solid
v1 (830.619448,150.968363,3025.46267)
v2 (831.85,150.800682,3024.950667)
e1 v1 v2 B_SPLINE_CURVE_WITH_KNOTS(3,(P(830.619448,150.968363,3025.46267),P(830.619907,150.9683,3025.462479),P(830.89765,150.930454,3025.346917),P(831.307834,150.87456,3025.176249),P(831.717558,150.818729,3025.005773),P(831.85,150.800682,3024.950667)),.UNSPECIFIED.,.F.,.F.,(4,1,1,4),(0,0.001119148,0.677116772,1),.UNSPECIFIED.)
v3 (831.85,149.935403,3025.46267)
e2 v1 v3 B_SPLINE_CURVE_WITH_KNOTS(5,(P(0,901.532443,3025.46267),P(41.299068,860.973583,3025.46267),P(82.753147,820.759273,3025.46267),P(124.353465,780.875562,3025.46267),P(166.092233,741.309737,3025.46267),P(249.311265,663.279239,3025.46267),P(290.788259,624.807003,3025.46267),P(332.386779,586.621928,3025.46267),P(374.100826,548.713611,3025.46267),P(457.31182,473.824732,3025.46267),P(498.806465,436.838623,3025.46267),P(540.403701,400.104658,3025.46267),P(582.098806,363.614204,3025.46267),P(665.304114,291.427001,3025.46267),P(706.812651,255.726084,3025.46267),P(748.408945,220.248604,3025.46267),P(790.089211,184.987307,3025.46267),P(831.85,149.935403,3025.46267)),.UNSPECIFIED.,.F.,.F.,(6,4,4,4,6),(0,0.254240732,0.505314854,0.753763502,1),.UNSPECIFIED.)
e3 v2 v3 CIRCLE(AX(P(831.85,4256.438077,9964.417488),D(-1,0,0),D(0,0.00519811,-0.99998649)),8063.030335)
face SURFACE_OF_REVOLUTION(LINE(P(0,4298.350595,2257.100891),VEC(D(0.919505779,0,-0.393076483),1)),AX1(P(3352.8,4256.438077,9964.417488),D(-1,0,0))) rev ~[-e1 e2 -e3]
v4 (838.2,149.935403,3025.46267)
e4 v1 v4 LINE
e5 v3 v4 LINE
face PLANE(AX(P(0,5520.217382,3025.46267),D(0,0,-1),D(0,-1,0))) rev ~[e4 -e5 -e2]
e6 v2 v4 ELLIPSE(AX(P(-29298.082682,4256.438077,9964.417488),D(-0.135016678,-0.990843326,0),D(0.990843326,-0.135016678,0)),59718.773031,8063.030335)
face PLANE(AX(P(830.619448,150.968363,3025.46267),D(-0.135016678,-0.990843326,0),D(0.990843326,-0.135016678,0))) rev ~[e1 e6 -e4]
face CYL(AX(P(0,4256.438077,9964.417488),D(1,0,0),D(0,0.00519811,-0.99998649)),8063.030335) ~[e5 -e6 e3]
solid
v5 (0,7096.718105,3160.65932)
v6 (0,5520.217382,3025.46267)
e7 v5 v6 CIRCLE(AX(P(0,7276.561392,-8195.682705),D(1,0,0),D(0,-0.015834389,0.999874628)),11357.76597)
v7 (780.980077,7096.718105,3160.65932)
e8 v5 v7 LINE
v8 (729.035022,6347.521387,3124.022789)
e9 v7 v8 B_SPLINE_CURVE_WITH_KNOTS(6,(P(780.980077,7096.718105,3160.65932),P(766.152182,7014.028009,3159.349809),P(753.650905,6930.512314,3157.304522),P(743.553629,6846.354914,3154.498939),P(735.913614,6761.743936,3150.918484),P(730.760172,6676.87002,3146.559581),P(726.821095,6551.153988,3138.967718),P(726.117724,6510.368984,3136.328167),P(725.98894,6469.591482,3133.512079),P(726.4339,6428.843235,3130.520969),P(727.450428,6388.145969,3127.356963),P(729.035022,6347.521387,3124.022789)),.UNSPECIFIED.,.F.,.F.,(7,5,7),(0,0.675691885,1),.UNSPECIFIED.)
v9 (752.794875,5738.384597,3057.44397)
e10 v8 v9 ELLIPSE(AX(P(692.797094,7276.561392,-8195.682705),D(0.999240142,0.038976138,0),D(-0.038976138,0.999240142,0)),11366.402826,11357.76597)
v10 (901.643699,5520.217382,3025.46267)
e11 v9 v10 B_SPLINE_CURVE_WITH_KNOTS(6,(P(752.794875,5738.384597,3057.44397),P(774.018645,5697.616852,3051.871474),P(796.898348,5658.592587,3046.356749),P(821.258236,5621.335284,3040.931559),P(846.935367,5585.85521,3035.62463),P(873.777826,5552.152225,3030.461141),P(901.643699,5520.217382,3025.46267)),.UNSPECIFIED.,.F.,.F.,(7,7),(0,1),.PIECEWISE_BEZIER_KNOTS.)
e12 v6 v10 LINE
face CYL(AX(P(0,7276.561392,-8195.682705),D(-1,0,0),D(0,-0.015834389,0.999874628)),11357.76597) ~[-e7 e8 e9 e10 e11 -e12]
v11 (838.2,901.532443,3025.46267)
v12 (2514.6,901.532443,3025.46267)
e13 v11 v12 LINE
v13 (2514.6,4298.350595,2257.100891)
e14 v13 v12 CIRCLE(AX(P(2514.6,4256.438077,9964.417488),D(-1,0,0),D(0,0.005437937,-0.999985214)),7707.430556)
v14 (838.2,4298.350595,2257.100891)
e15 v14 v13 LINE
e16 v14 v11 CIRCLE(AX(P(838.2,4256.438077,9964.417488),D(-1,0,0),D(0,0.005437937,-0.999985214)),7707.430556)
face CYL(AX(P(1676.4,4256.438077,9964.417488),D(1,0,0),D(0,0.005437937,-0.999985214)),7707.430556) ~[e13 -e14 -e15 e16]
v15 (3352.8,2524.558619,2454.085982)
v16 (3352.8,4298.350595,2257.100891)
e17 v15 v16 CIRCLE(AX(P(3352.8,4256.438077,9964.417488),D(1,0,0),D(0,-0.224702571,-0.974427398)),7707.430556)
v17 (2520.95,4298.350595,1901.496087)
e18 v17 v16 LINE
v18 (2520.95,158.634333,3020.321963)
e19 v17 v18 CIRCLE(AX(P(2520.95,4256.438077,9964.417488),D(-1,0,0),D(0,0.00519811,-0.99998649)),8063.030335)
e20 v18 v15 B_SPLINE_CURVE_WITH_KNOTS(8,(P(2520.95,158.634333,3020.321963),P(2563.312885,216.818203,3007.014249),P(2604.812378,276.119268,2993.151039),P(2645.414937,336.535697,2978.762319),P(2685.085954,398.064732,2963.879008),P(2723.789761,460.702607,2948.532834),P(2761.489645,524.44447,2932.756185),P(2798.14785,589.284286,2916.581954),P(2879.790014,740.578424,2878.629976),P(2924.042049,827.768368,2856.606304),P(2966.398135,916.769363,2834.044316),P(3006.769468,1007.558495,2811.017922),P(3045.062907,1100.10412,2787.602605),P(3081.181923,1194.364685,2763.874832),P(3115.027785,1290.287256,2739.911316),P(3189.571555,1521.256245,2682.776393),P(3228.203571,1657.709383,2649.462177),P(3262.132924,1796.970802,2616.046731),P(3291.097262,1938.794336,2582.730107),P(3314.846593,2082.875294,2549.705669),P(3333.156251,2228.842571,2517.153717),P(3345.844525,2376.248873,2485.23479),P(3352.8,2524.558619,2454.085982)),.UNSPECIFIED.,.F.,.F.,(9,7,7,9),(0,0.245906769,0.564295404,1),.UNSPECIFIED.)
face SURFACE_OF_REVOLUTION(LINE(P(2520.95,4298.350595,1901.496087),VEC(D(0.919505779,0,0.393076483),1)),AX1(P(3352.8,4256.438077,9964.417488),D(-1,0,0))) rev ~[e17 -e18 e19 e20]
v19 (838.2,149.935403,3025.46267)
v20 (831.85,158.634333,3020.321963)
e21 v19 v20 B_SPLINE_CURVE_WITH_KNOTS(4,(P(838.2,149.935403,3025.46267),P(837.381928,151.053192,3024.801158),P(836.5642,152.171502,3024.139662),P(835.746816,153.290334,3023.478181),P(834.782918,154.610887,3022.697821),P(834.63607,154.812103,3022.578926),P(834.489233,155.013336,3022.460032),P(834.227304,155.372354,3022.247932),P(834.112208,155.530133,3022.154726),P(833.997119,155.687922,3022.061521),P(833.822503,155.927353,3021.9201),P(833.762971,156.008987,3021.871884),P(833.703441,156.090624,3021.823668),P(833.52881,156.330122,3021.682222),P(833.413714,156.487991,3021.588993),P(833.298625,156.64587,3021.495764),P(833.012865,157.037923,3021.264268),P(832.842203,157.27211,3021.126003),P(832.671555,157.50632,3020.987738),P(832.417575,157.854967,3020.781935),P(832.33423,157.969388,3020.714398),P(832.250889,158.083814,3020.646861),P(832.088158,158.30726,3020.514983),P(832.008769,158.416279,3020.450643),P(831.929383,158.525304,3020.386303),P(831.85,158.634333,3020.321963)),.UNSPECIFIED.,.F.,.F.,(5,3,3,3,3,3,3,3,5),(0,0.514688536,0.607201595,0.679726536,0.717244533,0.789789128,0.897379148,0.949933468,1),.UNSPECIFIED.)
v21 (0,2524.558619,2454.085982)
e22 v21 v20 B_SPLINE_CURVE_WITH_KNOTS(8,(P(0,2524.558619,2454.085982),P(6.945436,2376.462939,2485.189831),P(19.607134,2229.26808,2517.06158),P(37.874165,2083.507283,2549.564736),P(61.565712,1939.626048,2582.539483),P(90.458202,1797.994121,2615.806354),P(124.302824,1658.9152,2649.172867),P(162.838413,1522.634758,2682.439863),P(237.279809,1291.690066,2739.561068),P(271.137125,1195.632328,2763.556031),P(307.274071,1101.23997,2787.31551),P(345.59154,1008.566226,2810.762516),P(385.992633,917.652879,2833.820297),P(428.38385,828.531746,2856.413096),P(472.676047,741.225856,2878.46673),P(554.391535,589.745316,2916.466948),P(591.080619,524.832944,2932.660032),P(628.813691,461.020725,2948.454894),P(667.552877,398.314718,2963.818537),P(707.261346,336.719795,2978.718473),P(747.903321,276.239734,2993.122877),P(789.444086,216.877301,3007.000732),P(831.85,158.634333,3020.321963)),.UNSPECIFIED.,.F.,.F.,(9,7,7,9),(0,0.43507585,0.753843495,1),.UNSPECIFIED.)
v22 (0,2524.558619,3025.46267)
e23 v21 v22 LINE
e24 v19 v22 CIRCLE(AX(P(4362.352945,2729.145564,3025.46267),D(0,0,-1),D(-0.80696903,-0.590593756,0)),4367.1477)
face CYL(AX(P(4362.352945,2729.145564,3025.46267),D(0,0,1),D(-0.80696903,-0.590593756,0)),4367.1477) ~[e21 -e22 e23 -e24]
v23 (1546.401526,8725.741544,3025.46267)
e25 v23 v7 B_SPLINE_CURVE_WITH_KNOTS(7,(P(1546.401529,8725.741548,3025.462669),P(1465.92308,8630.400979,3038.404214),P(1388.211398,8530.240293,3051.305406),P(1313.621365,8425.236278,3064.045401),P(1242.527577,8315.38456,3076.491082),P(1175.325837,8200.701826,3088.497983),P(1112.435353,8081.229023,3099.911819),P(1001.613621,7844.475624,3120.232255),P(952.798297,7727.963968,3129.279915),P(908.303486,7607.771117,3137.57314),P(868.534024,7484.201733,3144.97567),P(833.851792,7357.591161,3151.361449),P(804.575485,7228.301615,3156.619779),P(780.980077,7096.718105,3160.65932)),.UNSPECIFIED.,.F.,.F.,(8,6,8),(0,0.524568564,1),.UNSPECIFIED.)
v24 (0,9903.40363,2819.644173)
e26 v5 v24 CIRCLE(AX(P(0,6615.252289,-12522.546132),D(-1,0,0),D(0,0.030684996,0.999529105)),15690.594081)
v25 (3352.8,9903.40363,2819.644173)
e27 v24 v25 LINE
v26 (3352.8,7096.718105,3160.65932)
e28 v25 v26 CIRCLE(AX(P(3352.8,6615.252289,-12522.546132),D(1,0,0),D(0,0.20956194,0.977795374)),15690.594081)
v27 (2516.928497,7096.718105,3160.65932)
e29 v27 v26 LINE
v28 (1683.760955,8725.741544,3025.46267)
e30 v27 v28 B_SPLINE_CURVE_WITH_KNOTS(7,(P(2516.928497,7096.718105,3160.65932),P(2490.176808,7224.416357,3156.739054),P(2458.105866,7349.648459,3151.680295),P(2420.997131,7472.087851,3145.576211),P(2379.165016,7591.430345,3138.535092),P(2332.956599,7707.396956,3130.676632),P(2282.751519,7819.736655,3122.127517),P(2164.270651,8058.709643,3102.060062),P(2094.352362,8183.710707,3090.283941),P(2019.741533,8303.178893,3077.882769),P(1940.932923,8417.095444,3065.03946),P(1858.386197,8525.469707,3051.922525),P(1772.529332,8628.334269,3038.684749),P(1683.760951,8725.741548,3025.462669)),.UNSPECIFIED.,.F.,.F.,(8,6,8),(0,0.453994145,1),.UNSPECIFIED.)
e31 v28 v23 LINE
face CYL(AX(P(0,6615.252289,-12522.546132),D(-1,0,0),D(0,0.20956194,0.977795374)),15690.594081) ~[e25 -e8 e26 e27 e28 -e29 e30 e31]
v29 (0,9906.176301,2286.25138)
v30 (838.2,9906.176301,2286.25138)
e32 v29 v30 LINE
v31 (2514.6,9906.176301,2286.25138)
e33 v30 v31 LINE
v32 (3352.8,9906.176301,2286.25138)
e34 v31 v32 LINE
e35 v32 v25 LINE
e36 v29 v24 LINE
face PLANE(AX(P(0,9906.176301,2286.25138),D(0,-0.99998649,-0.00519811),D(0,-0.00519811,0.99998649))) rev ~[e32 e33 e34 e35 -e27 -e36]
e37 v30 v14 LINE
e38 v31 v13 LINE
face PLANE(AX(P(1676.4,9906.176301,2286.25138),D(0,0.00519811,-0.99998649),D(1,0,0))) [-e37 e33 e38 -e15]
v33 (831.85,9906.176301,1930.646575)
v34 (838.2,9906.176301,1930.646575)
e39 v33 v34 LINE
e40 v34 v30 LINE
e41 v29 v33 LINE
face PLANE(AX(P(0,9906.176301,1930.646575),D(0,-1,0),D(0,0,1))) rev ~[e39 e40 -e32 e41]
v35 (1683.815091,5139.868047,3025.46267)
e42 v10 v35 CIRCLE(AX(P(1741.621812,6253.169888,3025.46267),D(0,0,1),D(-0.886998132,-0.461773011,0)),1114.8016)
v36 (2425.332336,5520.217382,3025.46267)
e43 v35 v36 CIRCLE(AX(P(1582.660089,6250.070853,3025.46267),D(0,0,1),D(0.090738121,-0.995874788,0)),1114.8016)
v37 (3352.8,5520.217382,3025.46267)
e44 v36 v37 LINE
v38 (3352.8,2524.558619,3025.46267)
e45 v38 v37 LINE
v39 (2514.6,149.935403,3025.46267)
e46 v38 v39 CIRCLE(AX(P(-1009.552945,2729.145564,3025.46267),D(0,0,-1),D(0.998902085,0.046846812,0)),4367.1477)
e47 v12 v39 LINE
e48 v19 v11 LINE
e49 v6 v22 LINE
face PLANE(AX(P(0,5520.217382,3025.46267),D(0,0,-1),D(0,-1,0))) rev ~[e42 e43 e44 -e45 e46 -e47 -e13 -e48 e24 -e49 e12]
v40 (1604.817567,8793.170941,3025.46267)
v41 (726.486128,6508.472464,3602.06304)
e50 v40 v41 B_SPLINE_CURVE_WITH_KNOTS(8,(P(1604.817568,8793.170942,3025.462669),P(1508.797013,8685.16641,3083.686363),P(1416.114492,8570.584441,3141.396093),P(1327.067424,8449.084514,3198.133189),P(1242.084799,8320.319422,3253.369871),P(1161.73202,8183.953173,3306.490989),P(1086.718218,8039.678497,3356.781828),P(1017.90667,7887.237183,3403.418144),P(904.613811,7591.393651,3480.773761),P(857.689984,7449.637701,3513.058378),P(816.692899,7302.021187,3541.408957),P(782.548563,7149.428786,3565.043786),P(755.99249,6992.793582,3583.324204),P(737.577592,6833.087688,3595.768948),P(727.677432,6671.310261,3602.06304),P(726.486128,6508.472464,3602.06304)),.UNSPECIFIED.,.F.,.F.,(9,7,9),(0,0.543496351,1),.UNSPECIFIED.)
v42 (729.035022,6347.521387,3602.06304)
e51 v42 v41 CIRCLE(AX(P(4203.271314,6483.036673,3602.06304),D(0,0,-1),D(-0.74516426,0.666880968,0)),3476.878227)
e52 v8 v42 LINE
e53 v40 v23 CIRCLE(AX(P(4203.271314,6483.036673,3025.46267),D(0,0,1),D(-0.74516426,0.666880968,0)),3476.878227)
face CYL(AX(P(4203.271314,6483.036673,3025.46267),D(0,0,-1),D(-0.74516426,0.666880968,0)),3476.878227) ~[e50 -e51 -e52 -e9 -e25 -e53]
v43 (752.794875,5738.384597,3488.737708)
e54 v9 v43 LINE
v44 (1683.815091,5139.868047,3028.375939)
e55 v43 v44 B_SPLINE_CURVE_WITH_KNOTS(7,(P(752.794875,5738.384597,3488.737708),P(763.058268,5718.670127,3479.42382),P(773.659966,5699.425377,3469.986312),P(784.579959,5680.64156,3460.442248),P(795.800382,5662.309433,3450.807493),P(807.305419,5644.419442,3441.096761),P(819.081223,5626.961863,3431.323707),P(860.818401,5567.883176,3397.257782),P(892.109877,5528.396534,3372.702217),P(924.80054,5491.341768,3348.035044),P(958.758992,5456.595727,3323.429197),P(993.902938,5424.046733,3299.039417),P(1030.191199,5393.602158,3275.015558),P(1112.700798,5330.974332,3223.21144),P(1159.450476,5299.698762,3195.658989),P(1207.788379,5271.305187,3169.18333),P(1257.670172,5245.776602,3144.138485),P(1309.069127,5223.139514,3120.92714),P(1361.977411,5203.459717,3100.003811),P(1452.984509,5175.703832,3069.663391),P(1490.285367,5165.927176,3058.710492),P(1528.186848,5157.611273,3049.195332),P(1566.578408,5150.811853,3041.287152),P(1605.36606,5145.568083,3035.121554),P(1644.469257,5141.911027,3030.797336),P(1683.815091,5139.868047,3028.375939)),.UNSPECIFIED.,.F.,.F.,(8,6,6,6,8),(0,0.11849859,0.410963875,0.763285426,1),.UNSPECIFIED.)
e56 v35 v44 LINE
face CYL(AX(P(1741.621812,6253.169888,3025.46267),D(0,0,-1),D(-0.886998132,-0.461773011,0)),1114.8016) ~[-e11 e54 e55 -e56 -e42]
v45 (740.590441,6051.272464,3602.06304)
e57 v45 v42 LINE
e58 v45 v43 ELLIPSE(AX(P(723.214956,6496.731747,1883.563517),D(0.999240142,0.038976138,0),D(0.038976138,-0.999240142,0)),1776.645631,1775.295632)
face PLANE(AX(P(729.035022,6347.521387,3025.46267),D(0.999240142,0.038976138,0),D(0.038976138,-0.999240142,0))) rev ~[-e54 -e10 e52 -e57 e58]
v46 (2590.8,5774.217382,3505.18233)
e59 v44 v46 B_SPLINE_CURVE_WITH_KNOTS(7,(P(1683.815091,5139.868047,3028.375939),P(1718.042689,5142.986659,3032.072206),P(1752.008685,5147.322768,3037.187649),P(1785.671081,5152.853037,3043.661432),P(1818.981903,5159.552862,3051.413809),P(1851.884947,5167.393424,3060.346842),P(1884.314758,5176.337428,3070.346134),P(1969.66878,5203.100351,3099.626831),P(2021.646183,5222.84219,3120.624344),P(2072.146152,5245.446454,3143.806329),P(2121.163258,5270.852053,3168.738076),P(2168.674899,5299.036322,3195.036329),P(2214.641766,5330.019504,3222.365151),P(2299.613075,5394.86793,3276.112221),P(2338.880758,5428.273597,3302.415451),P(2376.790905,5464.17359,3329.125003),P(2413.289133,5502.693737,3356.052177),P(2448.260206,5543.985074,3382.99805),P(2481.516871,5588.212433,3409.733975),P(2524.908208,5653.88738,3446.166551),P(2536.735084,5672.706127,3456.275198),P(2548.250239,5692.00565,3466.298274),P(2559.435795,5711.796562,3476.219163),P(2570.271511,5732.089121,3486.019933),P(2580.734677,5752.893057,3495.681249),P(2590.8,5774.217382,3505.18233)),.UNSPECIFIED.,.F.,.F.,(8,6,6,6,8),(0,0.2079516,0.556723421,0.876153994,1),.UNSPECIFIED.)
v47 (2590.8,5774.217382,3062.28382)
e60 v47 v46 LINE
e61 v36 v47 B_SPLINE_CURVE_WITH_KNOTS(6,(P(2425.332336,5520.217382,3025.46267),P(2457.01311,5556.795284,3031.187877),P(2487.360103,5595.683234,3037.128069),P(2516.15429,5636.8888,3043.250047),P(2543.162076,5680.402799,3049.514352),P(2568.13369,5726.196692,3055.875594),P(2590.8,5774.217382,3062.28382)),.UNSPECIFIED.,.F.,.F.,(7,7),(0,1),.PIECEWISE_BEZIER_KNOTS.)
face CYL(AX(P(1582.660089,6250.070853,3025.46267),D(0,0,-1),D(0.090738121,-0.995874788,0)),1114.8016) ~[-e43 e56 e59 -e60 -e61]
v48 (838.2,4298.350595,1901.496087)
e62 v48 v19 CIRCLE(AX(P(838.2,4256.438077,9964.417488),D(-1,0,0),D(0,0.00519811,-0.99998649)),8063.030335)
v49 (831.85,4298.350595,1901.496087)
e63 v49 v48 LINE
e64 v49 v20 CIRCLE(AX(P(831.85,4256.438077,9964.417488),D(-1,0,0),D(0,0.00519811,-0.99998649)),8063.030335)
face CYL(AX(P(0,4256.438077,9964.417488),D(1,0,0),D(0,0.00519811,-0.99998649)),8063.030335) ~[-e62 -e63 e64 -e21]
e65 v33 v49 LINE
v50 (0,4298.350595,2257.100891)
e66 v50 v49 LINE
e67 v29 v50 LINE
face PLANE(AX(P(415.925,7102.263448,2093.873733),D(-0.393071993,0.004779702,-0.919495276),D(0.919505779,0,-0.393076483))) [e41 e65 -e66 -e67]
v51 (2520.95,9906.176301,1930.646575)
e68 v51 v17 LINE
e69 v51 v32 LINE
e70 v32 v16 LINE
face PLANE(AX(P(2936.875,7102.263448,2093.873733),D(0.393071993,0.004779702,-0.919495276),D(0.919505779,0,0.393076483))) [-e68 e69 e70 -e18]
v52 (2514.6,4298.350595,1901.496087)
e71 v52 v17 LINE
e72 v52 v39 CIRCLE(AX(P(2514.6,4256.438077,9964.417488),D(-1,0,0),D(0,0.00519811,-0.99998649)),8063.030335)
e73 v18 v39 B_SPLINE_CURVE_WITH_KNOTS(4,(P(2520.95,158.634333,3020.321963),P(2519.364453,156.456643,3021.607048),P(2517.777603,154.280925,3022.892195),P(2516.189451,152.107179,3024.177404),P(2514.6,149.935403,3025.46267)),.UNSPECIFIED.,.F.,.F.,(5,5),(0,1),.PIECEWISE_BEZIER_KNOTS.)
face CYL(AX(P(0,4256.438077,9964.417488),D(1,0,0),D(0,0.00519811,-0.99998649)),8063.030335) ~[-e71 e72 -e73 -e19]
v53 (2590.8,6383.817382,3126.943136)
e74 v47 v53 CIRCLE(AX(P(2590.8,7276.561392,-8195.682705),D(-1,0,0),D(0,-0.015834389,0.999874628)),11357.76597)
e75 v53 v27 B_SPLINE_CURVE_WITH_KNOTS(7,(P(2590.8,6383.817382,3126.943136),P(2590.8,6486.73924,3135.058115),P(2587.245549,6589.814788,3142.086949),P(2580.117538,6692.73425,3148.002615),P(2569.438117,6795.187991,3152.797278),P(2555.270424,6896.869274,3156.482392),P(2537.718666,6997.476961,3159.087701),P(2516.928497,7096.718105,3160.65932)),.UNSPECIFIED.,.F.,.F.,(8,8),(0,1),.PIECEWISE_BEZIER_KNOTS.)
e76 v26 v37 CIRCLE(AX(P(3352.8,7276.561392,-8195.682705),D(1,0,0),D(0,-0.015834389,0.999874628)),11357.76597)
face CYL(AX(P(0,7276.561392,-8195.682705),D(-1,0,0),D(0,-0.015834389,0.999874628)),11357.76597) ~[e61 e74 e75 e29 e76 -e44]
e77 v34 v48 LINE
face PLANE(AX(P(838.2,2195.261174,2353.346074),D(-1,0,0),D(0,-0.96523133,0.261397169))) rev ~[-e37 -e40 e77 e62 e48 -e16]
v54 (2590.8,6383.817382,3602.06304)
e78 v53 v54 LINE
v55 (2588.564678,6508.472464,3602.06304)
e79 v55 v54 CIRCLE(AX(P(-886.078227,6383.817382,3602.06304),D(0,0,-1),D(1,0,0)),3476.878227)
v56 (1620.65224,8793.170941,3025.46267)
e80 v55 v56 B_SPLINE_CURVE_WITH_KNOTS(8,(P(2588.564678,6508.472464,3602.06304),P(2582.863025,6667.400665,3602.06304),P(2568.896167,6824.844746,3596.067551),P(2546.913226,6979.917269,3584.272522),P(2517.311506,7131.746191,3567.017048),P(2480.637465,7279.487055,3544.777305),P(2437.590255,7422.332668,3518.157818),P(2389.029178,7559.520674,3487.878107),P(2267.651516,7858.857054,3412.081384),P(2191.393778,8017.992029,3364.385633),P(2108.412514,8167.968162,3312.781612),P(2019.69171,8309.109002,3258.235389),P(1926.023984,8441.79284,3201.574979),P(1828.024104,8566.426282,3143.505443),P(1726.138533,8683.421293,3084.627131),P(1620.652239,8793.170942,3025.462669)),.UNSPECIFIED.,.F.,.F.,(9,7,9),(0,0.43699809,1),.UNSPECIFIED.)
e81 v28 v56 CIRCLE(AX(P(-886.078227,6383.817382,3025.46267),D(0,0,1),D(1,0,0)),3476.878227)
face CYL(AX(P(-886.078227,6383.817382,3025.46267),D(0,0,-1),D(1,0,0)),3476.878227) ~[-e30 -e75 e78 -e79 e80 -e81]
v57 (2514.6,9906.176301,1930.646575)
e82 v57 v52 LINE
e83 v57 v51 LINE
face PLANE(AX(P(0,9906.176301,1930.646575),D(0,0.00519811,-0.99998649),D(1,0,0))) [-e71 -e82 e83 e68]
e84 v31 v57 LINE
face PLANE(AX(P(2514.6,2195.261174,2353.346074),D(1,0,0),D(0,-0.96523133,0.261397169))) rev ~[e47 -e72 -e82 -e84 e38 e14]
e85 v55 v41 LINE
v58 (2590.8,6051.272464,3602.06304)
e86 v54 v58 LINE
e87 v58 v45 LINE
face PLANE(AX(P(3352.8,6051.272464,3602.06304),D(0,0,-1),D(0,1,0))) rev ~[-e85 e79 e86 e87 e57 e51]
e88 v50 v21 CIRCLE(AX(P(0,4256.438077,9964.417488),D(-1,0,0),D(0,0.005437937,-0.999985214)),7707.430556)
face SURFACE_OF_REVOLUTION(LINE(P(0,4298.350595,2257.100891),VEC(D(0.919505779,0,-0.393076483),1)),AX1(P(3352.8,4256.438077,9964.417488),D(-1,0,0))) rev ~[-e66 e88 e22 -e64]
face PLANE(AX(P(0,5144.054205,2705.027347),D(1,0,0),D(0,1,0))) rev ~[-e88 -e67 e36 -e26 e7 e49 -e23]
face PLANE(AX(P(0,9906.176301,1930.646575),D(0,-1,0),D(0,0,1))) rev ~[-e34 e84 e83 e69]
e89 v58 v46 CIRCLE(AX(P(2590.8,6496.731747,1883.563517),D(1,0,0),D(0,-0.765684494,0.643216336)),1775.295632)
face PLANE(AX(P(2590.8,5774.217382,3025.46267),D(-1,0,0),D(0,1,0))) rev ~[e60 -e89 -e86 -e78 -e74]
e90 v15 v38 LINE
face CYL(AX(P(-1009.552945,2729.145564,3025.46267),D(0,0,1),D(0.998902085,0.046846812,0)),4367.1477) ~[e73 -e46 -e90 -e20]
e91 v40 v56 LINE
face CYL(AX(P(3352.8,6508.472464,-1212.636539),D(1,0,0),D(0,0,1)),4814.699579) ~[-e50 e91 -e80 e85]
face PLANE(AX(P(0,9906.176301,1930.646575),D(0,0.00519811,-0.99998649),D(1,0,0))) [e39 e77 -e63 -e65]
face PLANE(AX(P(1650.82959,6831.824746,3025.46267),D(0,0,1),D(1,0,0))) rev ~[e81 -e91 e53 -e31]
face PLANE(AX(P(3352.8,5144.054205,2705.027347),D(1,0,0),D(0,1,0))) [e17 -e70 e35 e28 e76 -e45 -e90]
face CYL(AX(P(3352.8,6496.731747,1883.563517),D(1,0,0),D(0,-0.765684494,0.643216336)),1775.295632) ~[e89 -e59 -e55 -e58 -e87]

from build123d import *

# Parameters (mm, degrees)
F1_DEPTH  = 3352.8
F3_DEPTH  = 914.4
F5_DEPTH  = 3352.8
F7_W      = 1676.4
F7_H      = 187.770880038
F7_H_2    = 355.604804315
F10_DEPTH = 1320.8


with BuildPart() as f1:
    # F0 (on Right) → F1 (new body)
    with BuildSketch(Plane.YZ):
        with BuildLine():
            Line((9906.1763013826, 2286.2513795817), (9903.4036295408, 2819.6441732065))
            ThreePointArc((9903.4036295408, 2819.6441732065), (8507.7575621146, 3053.498500359), (7096.718104665, 3160.6593204871))
            ThreePointArc((7096.718104665, 3160.6593204871), (6306.1105449526, 3120.5478052313), (5520.2173816261, 3025.4626698664))
            Line((5520.2173816261, 3025.4626698664), (149.9354032589, 3025.4626698664))
            ThreePointArc((149.9354032589, 3025.4626698664), (2186.9166194611, 2445.3700036504), (4296.5021474202, 2257.0912826433))
            Line((4296.5021474202, 2257.0912826433), (9906.1763013826, 2286.2513795817))
        make_face()
        with BuildLine():
            Line((9906.1763013826, 1930.6465752666), (9906.1763013826, 2286.2513795817))
            Line((9906.1763013826, 2286.2513795817), (4296.5021474202, 2257.0912826433))
            ThreePointArc((4296.5021474202, 2257.0912826433), (2186.9166194611, 2445.3700036504), (149.9354032589, 3025.4626698664))
            ThreePointArc((149.9354032589, 3025.4626698664), (2147.8725687033, 2181.9750901472), (4298.3505953147, 1901.4960868935))
            Line((4298.3505953147, 1901.4960868935), (9906.1763013826, 1930.6465752666))
        make_face()
    extrude(amount=F1_DEPTH)

    # F2 (on face) → F3 (join)
    with BuildSketch(Plane.XY.offset(3025.4626698664)):
        with BuildLine():
            ThreePointArc((1683.8150913295, 5139.8680466252), (2221.5916744575, 5336.534299223), (2590.8, 5774.2173816261))
            Line((2590.8, 5774.2173816261), (2590.8, 6383.8173816261))
            ThreePointArc((2590.8, 6383.8173816261), (2336.9387512428, 7687.9813910632), (1612.4259228504, 8801.700592041))
            ThreePointArc((1612.4259228504, 8801.700592041), (931.872095069, 7660.5889477995), (729.0350215534, 6347.5213871845))
            Line((729.0350215534, 6347.5213871845), (752.7948753911, 5738.3845968446))
            ThreePointArc((752.7948753911, 5738.3845968446), (1138.7818511996, 5315.4244063088), (1683.8150913295, 5139.8680466252))
        make_face()
    extrude(amount=F3_DEPTH)

    # F4 (on face) → F5 (cut)
    with BuildSketch(Plane.YZ.offset(3352.8)):
        with BuildLine():
            ThreePointArc((5137.4154090881, 3025.4626698664), (5549.4088046364, 3384.9807891534), (6051.2724639455, 3602.0630397775))
            Line((6051.2724639455, 3602.0630397775), (6508.4724639455, 3602.0630397775))
            ThreePointArc((6508.4724639455, 3602.0630397775), (7699.4079318865, 3452.4470342276), (8816.3271482832, 3012.8976036053))
            Line((8816.3271482832, 3012.8976036053), (8976.5672683716, 4052.9136657715))
            Line((8976.5672683716, 4052.9136657715), (5137.4154090881, 4052.9136657715))
            Line((5137.4154090881, 4052.9136657715), (5137.4154090881, 3025.4626698664))
        make_face()
    extrude(amount=-F5_DEPTH, mode=Mode.SUBTRACT)

    # F8: sweep along a path in F8_path
    with BuildLine(Plane(origin=(3352.8, 9906.1763013826, 1930.6465752666), x_dir=(0, 0, 1), z_dir=(1, 0, 0))) as f8_path:
        Line((0, 0), (-29.1504883732, 5607.8257060679))
        ThreePointArc((-29.1504883732, 5607.8257060679), (251.3285148806, 7758.3037326792), (1094.8160945997, 9756.2408981237))
    # F7 (on face) → F8 (sweep, cut)
    with BuildSketch(Plane(origin=(0, 9906.1763013826, 0), x_dir=(-1, 0, 0), z_dir=(0, 1, 0))):
        Polygon((-2520.95, 1930.6465752666), (-3352.8, 2286.2513795817), (-3352.8, 1930.6465752666), align=None)
        Polygon((-2514.6, 1742.8756952286), (-2514.6, 1930.6465752666), (-2520.95, 1930.6465752666), (-3352.8, 1930.6465752666), (-3352.8, 1742.8756952286), align=None)
        with Locations((-1676.4, 1836.7611352476)):
            Rectangle(F7_W, F7_H)
        Polygon((-831.85, 1930.6465752666), (-838.2, 1930.6465752666), (-838.2, 1742.8756952286), (192.50908494, 1742.8756952286), (381.6066980362, 2006.4663887024), (0, 2286.2513795817), (0, 1930.6465752666), align=None)
        Polygon((0, 1930.6465752666), (0, 2286.2513795817), (-831.85, 1930.6465752666), align=None)
        with Locations((-1676.4, 2108.4489774241)):
            Rectangle(F7_W, F7_H_2)
    sweep(path=f8_path.line, mode=Mode.SUBTRACT)

    # F9 (on face) → F10 (cut)
    with BuildSketch(Plane.XY.offset(3025.4626698664)):
        with BuildLine():
            ThreePointArc((0, 2524.5586190393), (-4.7947551509, 2729.1455643262), (0, 2933.732509613))
            Line((0, 2933.732509613), (-833.7602615356, 377.7640759945))
            Line((-833.7602615356, 377.7640759945), (830.6194482815, 150.9683626398))
            add(Edge.make_bspline(
                [(0, 901.5324430601), (41.2990684914, 860.9735825536), (82.7531470768, 820.7592729572), (124.3534648361, 780.8755615368), (166.0922333943, 741.3097367391), (249.3112654144, 663.2792388889), (290.7882589994, 624.8070025808), (332.386779466, 586.6219277036), (374.1008263909, 548.7136108018), (457.311819666, 473.8247323565), (498.8064651623, 436.8386233615), (540.4037012367, 400.1046584982), (582.0988058574, 363.6142038331), (665.0600262184, 291.6387661512), (706.3233958068, 256.1468967875), (747.673514319, 220.8758836415), (789.1066626784, 185.818597837), (830.6194482815, 150.9683626398)],
                knots=[0, 0, 0, 0, 0, 0, 0.2542407325, 0.2542407325, 0.2542407325, 0.2542407325, 0.505314854, 0.505314854, 0.505314854, 0.505314854, 0.7537635021, 0.7537635021, 0.7537635021, 0.7537635021, 0.9985488127, 0.9985488127, 0.9985488127, 0.9985488127, 0.9985488127, 0.9985488127], degree=5))
            Line((0, 901.5324430598), (0, 2524.5586190393))
        make_face()
        with BuildLine():
            ThreePointArc((838.2, 149.9354032589), (244.2280510065, 1275.5203057617), (0, 2524.5586190393))
            Line((0, 2524.5586190393), (0, 901.5324430598))
            add(Edge.make_bspline(
                [(0, 901.5324430601), (41.2990684914, 860.9735825536), (82.7531470768, 820.7592729572), (124.3534648361, 780.8755615368), (166.0922333943, 741.3097367391), (249.3112654144, 663.2792388889), (290.7882589994, 624.8070025808), (332.386779466, 586.6219277036), (374.1008263909, 548.7136108018), (457.311819666, 473.8247323565), (498.8064651623, 436.8386233615), (540.4037012367, 400.1046584982), (582.0988058574, 363.6142038331), (665.0600262184, 291.6387661512), (706.3233958068, 256.1468967875), (747.673514319, 220.8758836415), (789.1066626784, 185.818597837), (830.6194482815, 150.9683626398)],
                knots=[0, 0, 0, 0, 0, 0, 0.2542407325, 0.2542407325, 0.2542407325, 0.2542407325, 0.505314854, 0.505314854, 0.505314854, 0.505314854, 0.7537635021, 0.7537635021, 0.7537635021, 0.7537635021, 0.9985488127, 0.9985488127, 0.9985488127, 0.9985488127, 0.9985488127, 0.9985488127], degree=5))
            Line((830.6194482815, 150.9683626398), (838.2, 149.9354032589))
        make_face()
        with BuildLine():
            ThreePointArc((3352.8, 2524.5586190392), (3108.5719489935, 1275.5203057617), (2514.6, 149.9354032589))
            Line((2514.6, 149.9354032589), (2520.95, 149.9354032589))
            add(Edge.make_bspline(
                [(2520.95, 149.9354032589), (2562.7107893152, 184.9873072693), (2604.3910553646, 220.248604014), (2645.9873487862, 255.7260842272), (2687.4958862315, 291.4270008447), (2770.7011941431, 363.6142038335), (2812.3962987638, 400.1046584985), (2853.9935348381, 436.8386233618), (2895.4881803343, 473.8247323568), (2978.6991736092, 548.7136108019), (3020.4132205339, 586.6219277035), (3062.0117410005, 624.8070025807), (3103.4887345854, 663.2792388887), (3186.7077666055, 741.3097367389), (3228.4465351637, 780.8755615366), (3270.0468529231, 820.7592729571), (3311.5009315086, 860.9735825535), (3352.8, 901.5324430601)],
                knots=[0, 0, 0, 0, 0, 0, 0.2462364979, 0.2462364979, 0.2462364979, 0.2462364979, 0.494685146, 0.494685146, 0.494685146, 0.494685146, 0.7457592675, 0.7457592675, 0.7457592675, 0.7457592675, 1, 1, 1, 1, 1, 1], degree=5))
            Line((3352.8, 901.5324430598), (3352.8, 2524.5586190392))
        make_face()
        with BuildLine():
            ThreePointArc((3352.8, 2933.732509613), (3357.5947551509, 2729.1455643261), (3352.8, 2524.5586190392))
            Line((3352.8, 2524.5586190392), (3352.8, 901.5324430598))
            add(Edge.make_bspline(
                [(2520.95, 149.9354032589), (2562.7107893152, 184.9873072693), (2604.3910553646, 220.248604014), (2645.9873487862, 255.7260842272), (2687.4958862315, 291.4270008447), (2770.7011941431, 363.6142038335), (2812.3962987638, 400.1046584985), (2853.9935348381, 436.8386233618), (2895.4881803343, 473.8247323568), (2978.6991736092, 548.7136108019), (3020.4132205339, 586.6219277035), (3062.0117410005, 624.8070025807), (3103.4887345854, 663.2792388887), (3186.7077666055, 741.3097367389), (3228.4465351637, 780.8755615366), (3270.0468529231, 820.7592729571), (3311.5009315086, 860.9735825535), (3352.8, 901.5324430601)],
                knots=[0, 0, 0, 0, 0, 0, 0.2462364979, 0.2462364979, 0.2462364979, 0.2462364979, 0.494685146, 0.494685146, 0.494685146, 0.494685146, 0.7457592675, 0.7457592675, 0.7457592675, 0.7457592675, 1, 1, 1, 1, 1, 1], degree=5))
            Line((2520.95, 149.9354032589), (4820.351600647, 149.9354032589))
            Line((4820.351600647, 149.9354032589), (3352.8, 2933.732509613))
        make_face()
    extrude(amount=-F10_DEPTH, mode=Mode.SUBTRACT)


solid = f1.part
